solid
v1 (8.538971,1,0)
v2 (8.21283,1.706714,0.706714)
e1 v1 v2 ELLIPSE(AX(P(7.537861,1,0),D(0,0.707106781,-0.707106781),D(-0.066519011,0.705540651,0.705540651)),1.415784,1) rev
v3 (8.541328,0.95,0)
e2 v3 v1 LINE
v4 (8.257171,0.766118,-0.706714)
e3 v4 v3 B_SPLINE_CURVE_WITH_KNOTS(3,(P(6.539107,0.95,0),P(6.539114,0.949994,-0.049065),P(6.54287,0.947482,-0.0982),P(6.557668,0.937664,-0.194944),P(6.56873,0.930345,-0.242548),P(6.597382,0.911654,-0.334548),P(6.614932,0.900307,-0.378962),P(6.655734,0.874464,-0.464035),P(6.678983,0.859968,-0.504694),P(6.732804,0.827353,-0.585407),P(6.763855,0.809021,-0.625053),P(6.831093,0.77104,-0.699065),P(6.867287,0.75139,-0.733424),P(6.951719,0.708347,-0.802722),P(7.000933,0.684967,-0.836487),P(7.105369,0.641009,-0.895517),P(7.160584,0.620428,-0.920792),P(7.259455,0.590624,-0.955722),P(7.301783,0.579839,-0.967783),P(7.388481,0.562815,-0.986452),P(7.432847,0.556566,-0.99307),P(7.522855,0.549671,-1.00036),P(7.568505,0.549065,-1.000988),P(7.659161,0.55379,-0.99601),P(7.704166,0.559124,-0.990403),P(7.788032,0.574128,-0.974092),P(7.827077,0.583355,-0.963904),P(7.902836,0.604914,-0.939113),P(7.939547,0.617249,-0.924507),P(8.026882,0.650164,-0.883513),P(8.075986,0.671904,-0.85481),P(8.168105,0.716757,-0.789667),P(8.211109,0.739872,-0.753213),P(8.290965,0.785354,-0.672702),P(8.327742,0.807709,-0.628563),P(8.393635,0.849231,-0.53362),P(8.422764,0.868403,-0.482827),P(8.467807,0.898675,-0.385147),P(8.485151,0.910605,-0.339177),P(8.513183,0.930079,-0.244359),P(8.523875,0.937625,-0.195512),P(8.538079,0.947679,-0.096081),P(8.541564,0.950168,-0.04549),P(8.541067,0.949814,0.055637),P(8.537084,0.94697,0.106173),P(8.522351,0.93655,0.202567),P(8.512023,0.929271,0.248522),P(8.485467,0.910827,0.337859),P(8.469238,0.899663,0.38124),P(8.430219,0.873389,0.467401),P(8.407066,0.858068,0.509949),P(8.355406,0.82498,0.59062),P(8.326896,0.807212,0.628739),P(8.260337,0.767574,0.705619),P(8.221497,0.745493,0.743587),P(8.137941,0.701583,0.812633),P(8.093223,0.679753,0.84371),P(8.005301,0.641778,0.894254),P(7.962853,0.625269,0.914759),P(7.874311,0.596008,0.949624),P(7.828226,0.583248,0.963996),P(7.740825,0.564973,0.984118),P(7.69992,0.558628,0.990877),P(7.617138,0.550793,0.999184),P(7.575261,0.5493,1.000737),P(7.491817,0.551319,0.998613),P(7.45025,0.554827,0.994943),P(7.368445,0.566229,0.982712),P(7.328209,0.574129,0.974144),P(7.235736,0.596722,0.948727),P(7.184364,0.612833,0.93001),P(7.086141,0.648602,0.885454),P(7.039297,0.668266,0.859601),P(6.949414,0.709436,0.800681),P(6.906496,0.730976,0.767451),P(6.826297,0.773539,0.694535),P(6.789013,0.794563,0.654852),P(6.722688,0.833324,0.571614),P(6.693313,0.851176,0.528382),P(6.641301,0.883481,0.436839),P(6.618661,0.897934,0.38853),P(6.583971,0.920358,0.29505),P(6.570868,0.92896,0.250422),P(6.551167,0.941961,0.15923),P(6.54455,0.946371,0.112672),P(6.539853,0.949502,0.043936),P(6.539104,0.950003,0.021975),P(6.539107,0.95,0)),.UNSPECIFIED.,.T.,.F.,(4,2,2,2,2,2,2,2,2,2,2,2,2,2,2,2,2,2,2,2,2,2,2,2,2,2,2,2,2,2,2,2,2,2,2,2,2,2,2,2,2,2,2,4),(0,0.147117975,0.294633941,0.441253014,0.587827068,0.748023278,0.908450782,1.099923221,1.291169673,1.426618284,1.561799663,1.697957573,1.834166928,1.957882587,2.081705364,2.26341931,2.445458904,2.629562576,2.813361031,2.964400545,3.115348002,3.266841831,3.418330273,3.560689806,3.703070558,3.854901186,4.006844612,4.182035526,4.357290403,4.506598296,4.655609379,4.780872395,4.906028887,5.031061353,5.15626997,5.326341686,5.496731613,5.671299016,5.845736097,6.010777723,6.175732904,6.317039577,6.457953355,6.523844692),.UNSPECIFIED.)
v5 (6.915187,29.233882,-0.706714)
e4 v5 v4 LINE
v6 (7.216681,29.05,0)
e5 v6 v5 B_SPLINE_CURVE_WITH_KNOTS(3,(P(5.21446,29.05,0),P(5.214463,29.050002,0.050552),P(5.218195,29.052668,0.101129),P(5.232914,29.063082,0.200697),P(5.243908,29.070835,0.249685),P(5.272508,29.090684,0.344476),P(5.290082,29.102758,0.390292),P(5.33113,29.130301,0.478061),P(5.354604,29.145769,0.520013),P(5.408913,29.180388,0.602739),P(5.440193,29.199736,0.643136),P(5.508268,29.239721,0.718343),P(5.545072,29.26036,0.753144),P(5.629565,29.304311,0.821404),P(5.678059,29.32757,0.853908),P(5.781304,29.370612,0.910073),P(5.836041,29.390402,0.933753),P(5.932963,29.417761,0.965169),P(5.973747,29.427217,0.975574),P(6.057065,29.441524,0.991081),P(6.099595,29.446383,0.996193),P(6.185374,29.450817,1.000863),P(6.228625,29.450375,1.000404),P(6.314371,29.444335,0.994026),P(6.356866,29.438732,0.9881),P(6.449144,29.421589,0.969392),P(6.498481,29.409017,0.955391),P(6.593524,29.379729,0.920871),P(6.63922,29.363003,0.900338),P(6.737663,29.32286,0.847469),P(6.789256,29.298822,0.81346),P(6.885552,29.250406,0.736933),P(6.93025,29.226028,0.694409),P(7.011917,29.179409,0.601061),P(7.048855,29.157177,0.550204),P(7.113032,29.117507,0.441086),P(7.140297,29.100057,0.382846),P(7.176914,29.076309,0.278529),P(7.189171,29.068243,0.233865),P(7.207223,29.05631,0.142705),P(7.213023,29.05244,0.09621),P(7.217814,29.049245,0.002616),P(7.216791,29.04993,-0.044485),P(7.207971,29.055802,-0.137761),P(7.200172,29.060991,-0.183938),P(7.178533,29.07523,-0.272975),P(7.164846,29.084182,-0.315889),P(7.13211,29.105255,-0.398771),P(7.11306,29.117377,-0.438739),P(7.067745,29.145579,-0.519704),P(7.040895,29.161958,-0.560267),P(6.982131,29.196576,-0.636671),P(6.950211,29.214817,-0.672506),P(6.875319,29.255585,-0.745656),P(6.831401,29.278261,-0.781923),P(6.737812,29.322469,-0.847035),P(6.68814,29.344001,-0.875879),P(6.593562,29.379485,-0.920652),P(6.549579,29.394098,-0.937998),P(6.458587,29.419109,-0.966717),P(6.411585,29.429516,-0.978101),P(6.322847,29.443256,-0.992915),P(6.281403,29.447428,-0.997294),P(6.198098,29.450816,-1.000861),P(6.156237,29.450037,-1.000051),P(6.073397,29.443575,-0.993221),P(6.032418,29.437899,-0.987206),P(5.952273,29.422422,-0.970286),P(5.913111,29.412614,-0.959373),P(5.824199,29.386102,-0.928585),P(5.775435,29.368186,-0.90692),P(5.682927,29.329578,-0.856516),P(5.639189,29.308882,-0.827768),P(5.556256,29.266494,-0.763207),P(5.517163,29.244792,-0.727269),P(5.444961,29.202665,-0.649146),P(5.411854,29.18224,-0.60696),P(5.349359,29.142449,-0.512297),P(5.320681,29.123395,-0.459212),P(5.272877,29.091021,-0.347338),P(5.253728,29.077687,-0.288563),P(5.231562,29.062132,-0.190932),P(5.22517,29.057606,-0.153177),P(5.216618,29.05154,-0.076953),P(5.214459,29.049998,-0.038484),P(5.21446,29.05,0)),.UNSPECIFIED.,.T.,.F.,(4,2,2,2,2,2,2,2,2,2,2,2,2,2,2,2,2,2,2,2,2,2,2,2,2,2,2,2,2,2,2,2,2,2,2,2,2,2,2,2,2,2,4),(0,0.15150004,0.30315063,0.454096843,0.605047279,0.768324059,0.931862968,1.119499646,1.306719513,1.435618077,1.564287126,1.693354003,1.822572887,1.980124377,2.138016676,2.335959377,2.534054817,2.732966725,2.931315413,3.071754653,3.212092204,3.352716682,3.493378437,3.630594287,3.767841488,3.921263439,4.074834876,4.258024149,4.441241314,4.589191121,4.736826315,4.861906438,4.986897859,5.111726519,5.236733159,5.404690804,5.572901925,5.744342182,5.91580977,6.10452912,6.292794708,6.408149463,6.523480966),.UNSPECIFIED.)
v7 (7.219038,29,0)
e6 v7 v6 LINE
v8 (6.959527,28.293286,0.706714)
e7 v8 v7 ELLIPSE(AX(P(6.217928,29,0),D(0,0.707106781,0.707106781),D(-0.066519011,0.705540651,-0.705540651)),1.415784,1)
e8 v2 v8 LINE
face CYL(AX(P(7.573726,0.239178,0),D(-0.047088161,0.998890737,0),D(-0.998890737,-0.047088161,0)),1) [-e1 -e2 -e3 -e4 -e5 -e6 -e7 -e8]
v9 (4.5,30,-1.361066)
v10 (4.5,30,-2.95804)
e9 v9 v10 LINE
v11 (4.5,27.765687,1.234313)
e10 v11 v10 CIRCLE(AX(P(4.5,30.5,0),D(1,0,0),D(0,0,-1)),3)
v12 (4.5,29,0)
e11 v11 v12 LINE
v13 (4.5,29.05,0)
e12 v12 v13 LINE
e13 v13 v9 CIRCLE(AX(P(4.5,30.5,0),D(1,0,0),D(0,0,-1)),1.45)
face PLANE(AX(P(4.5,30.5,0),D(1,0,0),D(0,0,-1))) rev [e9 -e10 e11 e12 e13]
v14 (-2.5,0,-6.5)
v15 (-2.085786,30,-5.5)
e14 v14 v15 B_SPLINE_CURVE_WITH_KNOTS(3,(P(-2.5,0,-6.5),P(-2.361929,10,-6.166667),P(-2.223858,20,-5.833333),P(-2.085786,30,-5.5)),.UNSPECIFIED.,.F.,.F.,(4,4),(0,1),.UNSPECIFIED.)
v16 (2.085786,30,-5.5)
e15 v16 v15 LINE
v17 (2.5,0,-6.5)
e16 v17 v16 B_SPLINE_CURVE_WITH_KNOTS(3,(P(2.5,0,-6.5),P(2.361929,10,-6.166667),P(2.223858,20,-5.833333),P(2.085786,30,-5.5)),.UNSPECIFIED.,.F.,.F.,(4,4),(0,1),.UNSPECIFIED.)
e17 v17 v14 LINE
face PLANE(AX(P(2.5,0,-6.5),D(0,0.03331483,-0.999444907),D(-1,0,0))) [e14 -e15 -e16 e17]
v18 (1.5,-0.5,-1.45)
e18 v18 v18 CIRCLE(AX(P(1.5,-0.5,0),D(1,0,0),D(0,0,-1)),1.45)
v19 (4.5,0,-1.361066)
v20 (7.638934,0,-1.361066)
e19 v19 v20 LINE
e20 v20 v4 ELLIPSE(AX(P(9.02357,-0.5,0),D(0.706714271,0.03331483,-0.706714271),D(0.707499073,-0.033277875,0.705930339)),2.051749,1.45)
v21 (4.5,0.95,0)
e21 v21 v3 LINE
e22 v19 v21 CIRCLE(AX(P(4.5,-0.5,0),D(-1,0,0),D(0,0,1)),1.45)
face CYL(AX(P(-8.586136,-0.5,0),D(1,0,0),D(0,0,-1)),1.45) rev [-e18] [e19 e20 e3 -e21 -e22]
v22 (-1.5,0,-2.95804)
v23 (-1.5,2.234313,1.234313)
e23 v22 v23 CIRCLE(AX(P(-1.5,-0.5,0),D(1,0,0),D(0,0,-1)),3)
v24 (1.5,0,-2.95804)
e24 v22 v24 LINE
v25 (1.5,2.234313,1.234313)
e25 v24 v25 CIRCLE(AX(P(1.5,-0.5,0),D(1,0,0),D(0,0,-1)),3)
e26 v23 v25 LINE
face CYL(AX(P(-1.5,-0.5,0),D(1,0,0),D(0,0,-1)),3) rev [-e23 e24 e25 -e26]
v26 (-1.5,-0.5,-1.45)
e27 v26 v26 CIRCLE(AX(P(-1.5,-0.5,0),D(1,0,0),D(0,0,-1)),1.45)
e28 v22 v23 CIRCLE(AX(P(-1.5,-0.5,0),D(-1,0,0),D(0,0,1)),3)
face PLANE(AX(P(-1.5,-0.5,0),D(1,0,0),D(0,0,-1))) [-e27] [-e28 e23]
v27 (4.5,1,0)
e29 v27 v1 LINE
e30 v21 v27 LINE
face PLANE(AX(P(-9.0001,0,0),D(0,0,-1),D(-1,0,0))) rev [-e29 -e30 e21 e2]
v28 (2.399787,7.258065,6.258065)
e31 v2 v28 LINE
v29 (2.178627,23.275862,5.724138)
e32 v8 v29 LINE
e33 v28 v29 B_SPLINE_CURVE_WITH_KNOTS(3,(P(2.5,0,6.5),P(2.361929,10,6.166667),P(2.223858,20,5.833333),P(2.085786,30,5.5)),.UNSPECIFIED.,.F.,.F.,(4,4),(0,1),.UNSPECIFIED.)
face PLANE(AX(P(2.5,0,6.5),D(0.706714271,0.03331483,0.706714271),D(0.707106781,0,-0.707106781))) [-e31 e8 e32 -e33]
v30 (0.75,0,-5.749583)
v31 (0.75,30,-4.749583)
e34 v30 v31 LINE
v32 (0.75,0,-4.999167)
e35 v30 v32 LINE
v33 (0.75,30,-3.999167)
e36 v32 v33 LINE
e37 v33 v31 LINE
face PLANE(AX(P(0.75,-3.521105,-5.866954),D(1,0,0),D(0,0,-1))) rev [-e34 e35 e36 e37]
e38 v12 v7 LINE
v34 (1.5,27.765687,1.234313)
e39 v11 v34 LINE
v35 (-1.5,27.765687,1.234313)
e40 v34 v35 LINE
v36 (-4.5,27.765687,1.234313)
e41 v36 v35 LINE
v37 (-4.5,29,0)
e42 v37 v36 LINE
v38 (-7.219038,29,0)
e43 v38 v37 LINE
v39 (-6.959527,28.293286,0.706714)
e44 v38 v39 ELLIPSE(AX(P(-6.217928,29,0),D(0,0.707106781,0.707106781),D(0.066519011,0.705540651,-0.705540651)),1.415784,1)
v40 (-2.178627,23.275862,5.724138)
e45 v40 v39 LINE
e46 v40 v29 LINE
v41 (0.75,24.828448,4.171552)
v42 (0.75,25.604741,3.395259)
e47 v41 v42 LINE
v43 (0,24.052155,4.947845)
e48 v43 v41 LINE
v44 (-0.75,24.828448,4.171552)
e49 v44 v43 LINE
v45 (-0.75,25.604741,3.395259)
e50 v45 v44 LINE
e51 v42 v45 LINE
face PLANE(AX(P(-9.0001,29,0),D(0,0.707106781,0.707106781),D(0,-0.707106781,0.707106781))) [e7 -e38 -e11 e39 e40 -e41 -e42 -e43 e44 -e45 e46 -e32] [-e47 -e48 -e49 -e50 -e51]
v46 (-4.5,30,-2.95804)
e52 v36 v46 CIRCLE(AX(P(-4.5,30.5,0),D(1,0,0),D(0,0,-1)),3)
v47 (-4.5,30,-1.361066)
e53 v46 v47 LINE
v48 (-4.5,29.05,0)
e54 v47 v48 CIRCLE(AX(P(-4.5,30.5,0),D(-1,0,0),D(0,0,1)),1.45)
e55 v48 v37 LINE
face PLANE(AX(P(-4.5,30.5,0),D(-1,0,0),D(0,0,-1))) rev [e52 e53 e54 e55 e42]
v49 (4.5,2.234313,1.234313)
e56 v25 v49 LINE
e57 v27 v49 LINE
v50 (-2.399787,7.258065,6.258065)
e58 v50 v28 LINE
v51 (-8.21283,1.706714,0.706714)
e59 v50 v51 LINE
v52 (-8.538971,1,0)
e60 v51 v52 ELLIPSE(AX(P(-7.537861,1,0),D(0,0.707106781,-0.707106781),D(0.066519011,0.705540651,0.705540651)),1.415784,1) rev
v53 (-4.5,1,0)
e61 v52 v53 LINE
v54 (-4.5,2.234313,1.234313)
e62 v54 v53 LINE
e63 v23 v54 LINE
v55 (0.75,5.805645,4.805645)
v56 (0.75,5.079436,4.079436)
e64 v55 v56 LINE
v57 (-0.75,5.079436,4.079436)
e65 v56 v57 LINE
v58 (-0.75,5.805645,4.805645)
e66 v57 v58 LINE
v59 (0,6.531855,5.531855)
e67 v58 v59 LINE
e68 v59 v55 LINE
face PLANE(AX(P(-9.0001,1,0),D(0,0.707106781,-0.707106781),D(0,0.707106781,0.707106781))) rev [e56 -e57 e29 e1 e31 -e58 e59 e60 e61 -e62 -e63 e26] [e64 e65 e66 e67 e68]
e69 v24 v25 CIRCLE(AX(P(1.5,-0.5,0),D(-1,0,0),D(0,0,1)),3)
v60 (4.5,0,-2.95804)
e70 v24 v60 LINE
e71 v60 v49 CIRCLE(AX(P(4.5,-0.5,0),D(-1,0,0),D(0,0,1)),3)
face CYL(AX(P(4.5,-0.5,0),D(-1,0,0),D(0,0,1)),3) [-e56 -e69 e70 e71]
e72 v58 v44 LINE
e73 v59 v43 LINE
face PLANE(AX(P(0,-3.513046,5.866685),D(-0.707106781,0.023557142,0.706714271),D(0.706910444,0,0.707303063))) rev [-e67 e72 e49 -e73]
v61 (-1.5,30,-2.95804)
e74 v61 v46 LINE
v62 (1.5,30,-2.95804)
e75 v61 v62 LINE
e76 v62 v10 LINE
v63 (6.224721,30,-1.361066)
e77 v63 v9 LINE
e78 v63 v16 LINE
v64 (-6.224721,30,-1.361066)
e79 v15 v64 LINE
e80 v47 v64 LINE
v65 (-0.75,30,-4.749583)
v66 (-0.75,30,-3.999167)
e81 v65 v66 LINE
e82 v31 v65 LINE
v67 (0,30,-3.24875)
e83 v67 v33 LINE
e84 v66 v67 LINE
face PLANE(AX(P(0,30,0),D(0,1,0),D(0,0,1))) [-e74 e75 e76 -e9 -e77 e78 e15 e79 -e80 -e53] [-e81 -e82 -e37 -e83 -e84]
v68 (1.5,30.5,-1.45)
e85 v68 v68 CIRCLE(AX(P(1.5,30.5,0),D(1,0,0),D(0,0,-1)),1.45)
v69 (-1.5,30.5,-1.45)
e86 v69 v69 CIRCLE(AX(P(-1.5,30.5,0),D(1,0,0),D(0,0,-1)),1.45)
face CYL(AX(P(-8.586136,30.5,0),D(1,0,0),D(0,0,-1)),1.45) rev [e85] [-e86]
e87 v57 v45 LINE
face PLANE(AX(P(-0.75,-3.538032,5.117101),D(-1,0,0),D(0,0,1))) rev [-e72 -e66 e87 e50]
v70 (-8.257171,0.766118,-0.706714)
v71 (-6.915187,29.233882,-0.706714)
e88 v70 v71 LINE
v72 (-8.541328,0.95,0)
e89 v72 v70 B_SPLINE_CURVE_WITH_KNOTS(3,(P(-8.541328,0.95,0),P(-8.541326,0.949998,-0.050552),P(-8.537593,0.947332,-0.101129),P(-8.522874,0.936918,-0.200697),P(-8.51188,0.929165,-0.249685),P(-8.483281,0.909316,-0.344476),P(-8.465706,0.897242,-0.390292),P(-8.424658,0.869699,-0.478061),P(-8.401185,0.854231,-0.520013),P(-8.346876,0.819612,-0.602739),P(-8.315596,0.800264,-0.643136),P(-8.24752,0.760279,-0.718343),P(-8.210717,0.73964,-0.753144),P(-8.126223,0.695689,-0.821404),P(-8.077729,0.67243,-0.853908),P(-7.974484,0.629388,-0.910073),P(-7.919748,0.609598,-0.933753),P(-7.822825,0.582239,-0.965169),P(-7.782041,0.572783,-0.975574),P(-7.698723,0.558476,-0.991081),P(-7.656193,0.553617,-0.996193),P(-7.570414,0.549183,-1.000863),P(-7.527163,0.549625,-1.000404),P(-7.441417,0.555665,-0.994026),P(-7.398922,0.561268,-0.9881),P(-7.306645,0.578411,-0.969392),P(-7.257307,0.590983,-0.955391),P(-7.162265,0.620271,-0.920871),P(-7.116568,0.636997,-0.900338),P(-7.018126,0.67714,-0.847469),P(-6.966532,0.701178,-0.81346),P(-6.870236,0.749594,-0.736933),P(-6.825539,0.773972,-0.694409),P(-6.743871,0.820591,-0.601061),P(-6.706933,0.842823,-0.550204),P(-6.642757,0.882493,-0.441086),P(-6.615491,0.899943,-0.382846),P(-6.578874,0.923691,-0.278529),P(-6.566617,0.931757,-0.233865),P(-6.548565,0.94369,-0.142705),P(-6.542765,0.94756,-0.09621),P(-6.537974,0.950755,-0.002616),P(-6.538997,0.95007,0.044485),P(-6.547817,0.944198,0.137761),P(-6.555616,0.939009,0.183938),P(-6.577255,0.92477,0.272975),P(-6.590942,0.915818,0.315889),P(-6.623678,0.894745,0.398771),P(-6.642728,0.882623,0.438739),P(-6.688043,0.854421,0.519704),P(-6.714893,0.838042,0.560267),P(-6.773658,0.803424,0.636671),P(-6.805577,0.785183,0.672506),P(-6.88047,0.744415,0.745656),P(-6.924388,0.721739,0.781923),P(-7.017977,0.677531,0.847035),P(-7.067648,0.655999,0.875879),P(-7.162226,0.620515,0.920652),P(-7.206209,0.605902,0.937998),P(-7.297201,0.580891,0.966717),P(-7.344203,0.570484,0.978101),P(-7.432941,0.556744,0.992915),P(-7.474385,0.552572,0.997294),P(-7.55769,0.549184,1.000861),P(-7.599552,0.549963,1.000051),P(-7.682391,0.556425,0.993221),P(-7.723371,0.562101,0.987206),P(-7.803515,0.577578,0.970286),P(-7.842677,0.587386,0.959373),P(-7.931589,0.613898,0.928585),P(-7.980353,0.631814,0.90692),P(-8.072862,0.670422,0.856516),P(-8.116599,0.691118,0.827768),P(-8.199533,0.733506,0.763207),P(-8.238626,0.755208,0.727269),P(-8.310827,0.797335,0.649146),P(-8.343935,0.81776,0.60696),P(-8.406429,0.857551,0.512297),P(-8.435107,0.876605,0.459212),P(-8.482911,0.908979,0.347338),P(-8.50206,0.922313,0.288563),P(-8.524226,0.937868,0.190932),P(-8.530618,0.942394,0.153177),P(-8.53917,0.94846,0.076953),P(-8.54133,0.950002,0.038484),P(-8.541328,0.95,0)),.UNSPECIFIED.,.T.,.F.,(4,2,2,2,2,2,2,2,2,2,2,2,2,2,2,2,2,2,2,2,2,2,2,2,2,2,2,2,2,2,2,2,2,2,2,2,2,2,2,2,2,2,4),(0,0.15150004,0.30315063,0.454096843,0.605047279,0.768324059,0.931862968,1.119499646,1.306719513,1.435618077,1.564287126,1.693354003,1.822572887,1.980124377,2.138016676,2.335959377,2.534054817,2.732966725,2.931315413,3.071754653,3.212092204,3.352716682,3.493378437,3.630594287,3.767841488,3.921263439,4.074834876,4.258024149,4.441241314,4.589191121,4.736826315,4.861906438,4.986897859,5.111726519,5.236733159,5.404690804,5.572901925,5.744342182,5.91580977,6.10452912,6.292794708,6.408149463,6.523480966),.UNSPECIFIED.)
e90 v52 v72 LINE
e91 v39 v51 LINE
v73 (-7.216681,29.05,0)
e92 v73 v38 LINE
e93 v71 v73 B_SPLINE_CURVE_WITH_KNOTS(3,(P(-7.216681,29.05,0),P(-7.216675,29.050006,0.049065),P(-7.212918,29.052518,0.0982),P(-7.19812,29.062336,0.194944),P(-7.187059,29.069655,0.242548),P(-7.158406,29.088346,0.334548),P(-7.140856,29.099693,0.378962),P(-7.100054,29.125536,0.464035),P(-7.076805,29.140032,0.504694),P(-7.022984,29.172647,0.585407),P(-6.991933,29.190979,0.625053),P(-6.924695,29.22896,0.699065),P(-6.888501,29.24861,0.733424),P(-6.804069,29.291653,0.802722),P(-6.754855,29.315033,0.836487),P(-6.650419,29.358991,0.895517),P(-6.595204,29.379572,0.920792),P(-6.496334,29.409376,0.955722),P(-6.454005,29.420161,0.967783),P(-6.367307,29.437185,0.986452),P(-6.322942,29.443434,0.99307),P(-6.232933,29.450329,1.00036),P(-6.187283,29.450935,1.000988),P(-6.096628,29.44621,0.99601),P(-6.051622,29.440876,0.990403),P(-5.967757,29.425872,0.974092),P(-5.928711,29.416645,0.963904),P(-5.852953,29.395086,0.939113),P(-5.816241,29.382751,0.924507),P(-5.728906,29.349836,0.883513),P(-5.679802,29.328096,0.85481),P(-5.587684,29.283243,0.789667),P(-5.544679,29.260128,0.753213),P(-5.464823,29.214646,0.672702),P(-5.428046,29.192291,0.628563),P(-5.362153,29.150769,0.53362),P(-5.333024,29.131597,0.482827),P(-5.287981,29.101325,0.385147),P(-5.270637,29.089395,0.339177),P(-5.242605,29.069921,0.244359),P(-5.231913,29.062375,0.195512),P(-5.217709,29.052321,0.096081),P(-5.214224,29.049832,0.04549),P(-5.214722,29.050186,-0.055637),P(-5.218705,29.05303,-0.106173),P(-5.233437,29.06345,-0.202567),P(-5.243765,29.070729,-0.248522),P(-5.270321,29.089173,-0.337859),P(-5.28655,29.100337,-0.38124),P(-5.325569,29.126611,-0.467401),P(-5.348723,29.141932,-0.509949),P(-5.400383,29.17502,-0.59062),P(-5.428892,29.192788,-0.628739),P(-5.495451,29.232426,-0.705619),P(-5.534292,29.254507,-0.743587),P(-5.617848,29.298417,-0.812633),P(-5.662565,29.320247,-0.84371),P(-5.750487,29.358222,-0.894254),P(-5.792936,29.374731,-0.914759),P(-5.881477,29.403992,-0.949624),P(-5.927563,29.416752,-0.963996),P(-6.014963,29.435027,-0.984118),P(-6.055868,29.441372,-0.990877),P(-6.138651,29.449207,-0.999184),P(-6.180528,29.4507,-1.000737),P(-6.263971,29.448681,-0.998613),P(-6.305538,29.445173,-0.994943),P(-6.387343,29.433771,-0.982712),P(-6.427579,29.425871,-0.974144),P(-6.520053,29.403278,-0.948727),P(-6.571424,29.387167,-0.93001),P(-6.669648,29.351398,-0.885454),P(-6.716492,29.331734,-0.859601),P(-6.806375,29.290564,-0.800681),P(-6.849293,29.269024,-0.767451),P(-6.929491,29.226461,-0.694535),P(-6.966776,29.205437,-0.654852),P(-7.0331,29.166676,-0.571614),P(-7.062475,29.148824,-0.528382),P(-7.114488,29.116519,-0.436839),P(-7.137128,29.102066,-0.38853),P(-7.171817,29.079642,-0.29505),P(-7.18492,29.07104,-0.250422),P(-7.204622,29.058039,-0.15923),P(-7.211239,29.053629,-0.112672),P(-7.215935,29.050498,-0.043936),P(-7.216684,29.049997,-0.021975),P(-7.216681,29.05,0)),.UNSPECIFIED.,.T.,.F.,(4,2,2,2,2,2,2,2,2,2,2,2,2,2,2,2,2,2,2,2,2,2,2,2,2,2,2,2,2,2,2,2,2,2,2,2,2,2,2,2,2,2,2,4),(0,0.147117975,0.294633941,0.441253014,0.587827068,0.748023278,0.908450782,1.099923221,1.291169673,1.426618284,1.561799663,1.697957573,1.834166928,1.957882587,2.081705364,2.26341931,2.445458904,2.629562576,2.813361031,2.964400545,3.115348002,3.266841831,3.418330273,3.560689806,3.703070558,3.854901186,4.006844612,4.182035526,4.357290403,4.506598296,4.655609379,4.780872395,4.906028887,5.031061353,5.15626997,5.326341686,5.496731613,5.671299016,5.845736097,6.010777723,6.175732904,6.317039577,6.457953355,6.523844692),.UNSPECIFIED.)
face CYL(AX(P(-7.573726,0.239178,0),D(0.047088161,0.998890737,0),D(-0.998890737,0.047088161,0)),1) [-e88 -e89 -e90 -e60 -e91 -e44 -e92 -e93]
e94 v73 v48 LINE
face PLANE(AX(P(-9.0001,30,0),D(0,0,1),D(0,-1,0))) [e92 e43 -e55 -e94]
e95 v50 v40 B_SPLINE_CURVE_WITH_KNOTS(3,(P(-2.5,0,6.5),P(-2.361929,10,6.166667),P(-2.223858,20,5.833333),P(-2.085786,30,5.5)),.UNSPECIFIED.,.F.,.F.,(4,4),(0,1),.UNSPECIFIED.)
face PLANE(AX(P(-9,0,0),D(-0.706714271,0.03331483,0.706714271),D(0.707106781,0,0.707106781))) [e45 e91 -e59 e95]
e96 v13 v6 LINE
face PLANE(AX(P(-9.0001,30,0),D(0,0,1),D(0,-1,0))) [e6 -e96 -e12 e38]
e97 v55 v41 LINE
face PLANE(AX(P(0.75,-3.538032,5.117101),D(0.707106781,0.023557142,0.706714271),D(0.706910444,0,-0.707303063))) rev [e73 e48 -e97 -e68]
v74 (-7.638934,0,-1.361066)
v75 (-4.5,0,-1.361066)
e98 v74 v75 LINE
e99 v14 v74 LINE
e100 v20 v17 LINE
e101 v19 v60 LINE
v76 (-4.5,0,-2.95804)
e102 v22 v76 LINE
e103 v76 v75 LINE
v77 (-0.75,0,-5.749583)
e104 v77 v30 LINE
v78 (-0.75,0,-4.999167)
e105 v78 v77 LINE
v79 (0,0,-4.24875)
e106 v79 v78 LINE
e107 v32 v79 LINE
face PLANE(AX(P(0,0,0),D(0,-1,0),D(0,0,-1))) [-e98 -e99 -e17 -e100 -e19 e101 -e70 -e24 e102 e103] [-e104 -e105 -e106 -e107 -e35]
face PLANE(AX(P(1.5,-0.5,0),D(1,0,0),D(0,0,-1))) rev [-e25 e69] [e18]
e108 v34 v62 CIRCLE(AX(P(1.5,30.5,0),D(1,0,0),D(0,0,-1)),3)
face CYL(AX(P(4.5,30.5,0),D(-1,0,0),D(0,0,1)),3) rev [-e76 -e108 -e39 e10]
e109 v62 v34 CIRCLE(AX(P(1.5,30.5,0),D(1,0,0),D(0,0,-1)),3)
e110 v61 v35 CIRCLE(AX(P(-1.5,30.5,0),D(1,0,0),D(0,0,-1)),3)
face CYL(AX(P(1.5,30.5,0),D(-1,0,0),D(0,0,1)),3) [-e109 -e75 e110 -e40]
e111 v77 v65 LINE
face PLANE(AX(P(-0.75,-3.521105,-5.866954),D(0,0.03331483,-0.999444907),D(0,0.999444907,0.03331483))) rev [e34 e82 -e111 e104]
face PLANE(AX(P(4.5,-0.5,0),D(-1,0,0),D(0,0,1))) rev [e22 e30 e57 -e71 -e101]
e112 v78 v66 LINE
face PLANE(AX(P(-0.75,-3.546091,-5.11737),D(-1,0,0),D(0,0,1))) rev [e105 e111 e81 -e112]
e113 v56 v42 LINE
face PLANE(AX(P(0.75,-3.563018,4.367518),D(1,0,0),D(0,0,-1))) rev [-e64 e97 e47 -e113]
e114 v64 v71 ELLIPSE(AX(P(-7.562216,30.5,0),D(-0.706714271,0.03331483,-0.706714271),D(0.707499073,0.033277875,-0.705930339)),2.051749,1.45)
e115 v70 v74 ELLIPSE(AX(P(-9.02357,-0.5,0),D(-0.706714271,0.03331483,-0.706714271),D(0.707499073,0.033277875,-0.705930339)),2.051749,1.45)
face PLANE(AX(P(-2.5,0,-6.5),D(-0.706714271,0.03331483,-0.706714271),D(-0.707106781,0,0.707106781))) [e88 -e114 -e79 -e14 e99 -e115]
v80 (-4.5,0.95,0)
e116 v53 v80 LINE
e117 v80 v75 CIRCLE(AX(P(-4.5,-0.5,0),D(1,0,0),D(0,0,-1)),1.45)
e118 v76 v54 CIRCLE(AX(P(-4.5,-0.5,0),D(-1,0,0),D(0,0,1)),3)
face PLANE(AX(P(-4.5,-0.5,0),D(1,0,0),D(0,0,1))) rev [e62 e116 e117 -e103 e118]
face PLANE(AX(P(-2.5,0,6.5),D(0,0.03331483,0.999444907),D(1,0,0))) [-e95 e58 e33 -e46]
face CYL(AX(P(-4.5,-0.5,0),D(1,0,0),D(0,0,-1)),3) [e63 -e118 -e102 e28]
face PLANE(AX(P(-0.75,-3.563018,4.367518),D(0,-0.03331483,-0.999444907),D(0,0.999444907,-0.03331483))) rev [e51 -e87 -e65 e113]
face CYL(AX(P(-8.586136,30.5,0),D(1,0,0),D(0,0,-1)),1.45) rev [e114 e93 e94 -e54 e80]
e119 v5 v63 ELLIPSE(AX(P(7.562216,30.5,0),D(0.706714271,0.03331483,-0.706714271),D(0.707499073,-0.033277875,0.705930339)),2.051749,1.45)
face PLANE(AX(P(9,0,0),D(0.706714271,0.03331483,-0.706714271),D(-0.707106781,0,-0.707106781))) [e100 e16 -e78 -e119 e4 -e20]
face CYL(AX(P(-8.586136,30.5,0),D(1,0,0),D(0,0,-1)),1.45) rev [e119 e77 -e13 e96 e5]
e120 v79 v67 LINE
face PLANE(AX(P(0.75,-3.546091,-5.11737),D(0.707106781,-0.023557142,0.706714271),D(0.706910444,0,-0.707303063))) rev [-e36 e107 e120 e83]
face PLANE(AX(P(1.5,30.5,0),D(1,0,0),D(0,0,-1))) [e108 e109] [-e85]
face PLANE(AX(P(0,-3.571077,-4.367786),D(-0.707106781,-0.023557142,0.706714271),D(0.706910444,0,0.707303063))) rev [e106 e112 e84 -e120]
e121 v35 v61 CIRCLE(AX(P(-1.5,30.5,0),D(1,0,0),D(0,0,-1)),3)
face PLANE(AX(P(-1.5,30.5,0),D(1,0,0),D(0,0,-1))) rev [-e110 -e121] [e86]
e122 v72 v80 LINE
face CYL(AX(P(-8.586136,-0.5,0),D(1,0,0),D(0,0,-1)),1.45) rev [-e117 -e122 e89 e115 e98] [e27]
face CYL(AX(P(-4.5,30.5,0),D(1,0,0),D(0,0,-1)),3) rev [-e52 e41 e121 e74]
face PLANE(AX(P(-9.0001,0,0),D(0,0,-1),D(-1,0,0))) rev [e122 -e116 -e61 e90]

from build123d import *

# Parameters (mm, degrees)
LOFT1_DEPTH             = 30
LOFT1_DRAFT             = 1.9091524
CUT_EXTRUDE2_DEPTH      = 32.988279093
CUT_EXTRUDE2_DEPTH_BACK = 32.988279093
FILLET2_R               = 1
SKETCH4_R               = 3
BOSS_EXTRUDE1_DEPTH     = 1.5
CUT_EXTRUDE3_START      = 3
SKETCH5_R               = 3
CUT_EXTRUDE3_DEPTH      = 3
SKETCH6_R               = 3
CUT_EXTRUDE4_DEPTH      = 1.5
BOSS_EXTRUDE2_START     = -3
SKETCH7_R               = 3
BOSS_EXTRUDE2_DEPTH     = 3
CUT_EXTRUDE5_DEPTH      = 22.529931357
CUT_EXTRUDE5_DEPTH_BACK = 22.529931357
CUT_EXTRUDE6_DEPTH      = 22.746838212
CUT_EXTRUDE6_DEPTH_BACK = 22.746838212
CUT_EXTRUDE7_DEPTH      = 36.188368954
CUT_EXTRUDE7_DEPTH_BACK = 36.188368954
SKETCH10_R              = 1.45


# Read off the part's stored shape, not the designer's step: Loft1
with BuildPart() as part:
    # Loft1 outline → Loft1 (with draft: the straight prism first)
    with BuildSketch(Plane(origin=(0, 30, 0), x_dir=(1, 0, 0), z_dir=(0, 1, 0))):
        Polygon((2.085786438, 5.5), (-2.085786438, 5.5), (-7.585786438, 0), (-2.085786438, -5.5), (2.085786438, -5.5), (7.585786438, 0), align=None)
    extrude(amount=-LOFT1_DEPTH)
    # Loft1: the draft: its side faces are tilted about the plane it starts from
    loft1_sides = [part.faces().sort_by_distance(p)[0] for p in [
        (0, 15, -5.5),
        (-4.835786438, 15, -2.75),
        (-4.835786438, 15, 2.75),
        (0, 15, 5.5),
        (4.835786438, 15, 2.75),
        (4.835786438, 15, -2.75),
    ]]
    draft(loft1_sides, Plane(origin=(0, 30, 0), x_dir=(1, 0, 0), z_dir=(0, 1, 0)), LOFT1_DRAFT)

    # Sketch3 → Cut-Extrude2 (cut, two sides: drawn at the far end of the back side and taken through both)
    with BuildSketch(Plane(origin=(0, 0, 0), x_dir=(0, 0, -1), z_dir=(1, 0, 0)).offset(-CUT_EXTRUDE2_DEPTH_BACK)):
        Polygon((0, 30), (0, 29), (-5.724137931, 23.275862069), (-5.5, 30), align=None)
        Polygon((0, 0), (0, 1), (-6.258064516, 7.258064516), (-6.5, 0), align=None)
    extrude(amount=CUT_EXTRUDE2_DEPTH + CUT_EXTRUDE2_DEPTH_BACK, mode=Mode.SUBTRACT)

    # Fillet2
    # the kernel refuses this fillet: 1 mm, written as the material it takes off along each edge
    with BuildSketch(Plane(origin=(-7.515337072, 31.494456763, 0), x_dir=(0.70593033942015, -0.0332778747610444, -0.7074990734534851), z_dir=(-0.04708816012216718, -0.9988907373563483, 0))) as fillet2_piece_1:
        with BuildLine():
            CenterArc((FILLET2_R * 0.998890737356, FILLET2_R), FILLET2_R, 180.063591331, 89.936408669)
            Line((-FILLET2_R * 0.00110864672901, FILLET2_R * 0.998890122125), (0, 0))
            Line((0, 0), (FILLET2_R * 0.998890737356, 0))
        make_face()
    extrude(amount=33.025547532, mode=Mode.SUBTRACT)
    with BuildSketch(Plane(origin=(7.515337072, 31.494456763, 0), x_dir=(-0.7059303394201507, -0.03327787476104443, -0.7074990734534845), z_dir=(0.04708816012216718, -0.9988907373563483, 0))) as fillet2_piece_2:
        with BuildLine():
            CenterArc((FILLET2_R * 0.998890737356, -FILLET2_R), FILLET2_R, 90, 89.936408669)
            Line((-FILLET2_R * 0.00110864672901, -FILLET2_R * 0.998890122125), (0, 0))
            Line((0, 0), (FILLET2_R * 0.998890737356, 0))
        make_face()
    extrude(amount=33.025547532, mode=Mode.SUBTRACT)

    # Sketch4 → Boss-Extrude1 (add, symmetric)
    with BuildSketch(Plane(origin=(0, 0, 0), x_dir=(0, 0, -1), z_dir=(1, 0, 0))):
        with Locations((0, 30.5)):
            Circle(SKETCH4_R)
    extrude(amount=BOSS_EXTRUDE1_DEPTH, both=True)

    # Sketch5 → Cut-Extrude3 (cut)
    with BuildSketch(Plane(origin=(1.5, 0, 0), x_dir=(0, 0, -1), z_dir=(1, 0, 0)).offset(CUT_EXTRUDE3_START)):
        with Locations((0, 30.5)):
            Circle(SKETCH5_R)
    cut_extrude3 = extrude(amount=-CUT_EXTRUDE3_DEPTH, mode=Mode.SUBTRACT)

    # Mirror1: Cut-Extrude3 across plane
    add(cut_extrude3.mirror(Plane(origin=(0, 0, 0), x_dir=(0, 0, 1), z_dir=(1, 0, 0))), mode=Mode.SUBTRACT)

    # Sketch6 → Cut-Extrude4 (cut, symmetric)
    with BuildSketch(Plane(origin=(0, 0, 0), x_dir=(0, 0, -1), z_dir=(1, 0, 0))):
        with Locations((0, -0.5)):
            Circle(SKETCH6_R)
    extrude(amount=CUT_EXTRUDE4_DEPTH, both=True, mode=Mode.SUBTRACT)

    # Sketch7 → Boss-Extrude2 (add)
    with BuildSketch(Plane.ZY.offset(-1.5).offset(BOSS_EXTRUDE2_START)):
        with Locations((0, -0.5)):
            Circle(SKETCH7_R)
    boss_extrude2 = extrude(amount=BOSS_EXTRUDE2_DEPTH)

    # Mirror2: Boss-Extrude2 across plane
    add(boss_extrude2.mirror(Plane(origin=(0, 0, 0), x_dir=(0, 0, 1), z_dir=(1, 0, 0))))

    # Sketch8 → Cut-Extrude5 (cut, two sides: drawn at the far end of the back side and taken through both)
    with BuildSketch(Plane(origin=(0, 15.050537099, -0.50168457), x_dir=(1, 0, 0), z_dir=(0, 0.9994449069791544, -0.0333148302326385)).offset(-CUT_EXTRUDE5_DEPTH_BACK)):
        Polygon((-0.75, -4.246391895), (0.75, -4.246391895), (0.75, -4.996391895), (0, -5.746391895), (-0.75, -4.996391895), align=None)
    extrude(amount=CUT_EXTRUDE5_DEPTH + CUT_EXTRUDE5_DEPTH_BACK, mode=Mode.SUBTRACT)

    # Sketch9 → Cut-Extrude6 (cut, two sides: drawn at the far end of the back side and taken through both)
    with BuildSketch(Plane(origin=(0, 14.783573807, 0.492785794), x_dir=(1, 0, 0), z_dir=(0, 0.9994449069791544, 0.0333148302326385)).offset(-CUT_EXTRUDE6_DEPTH_BACK)):
        Polygon((-0.75, 5.746391895), (0.75, 5.746391895), (0.75, 4.996391895), (0, 4.246391895), (-0.75, 4.996391895), align=None)
    extrude(amount=CUT_EXTRUDE6_DEPTH + CUT_EXTRUDE6_DEPTH_BACK, mode=Mode.SUBTRACT)

    # Sketch10 → Cut-Extrude7 (cut, two sides: drawn at the far end of the back side and taken through both)
    with BuildSketch(Plane(origin=(0, 0, 0), x_dir=(0, 0, -1), z_dir=(1, 0, 0)).offset(-CUT_EXTRUDE7_DEPTH_BACK)):
        with Locations((0, 30.5)):
            Circle(SKETCH10_R)
        with Locations((0, -0.5)):
            Circle(SKETCH10_R)
    extrude(amount=CUT_EXTRUDE7_DEPTH + CUT_EXTRUDE7_DEPTH_BACK, mode=Mode.SUBTRACT)


solid = part.part
